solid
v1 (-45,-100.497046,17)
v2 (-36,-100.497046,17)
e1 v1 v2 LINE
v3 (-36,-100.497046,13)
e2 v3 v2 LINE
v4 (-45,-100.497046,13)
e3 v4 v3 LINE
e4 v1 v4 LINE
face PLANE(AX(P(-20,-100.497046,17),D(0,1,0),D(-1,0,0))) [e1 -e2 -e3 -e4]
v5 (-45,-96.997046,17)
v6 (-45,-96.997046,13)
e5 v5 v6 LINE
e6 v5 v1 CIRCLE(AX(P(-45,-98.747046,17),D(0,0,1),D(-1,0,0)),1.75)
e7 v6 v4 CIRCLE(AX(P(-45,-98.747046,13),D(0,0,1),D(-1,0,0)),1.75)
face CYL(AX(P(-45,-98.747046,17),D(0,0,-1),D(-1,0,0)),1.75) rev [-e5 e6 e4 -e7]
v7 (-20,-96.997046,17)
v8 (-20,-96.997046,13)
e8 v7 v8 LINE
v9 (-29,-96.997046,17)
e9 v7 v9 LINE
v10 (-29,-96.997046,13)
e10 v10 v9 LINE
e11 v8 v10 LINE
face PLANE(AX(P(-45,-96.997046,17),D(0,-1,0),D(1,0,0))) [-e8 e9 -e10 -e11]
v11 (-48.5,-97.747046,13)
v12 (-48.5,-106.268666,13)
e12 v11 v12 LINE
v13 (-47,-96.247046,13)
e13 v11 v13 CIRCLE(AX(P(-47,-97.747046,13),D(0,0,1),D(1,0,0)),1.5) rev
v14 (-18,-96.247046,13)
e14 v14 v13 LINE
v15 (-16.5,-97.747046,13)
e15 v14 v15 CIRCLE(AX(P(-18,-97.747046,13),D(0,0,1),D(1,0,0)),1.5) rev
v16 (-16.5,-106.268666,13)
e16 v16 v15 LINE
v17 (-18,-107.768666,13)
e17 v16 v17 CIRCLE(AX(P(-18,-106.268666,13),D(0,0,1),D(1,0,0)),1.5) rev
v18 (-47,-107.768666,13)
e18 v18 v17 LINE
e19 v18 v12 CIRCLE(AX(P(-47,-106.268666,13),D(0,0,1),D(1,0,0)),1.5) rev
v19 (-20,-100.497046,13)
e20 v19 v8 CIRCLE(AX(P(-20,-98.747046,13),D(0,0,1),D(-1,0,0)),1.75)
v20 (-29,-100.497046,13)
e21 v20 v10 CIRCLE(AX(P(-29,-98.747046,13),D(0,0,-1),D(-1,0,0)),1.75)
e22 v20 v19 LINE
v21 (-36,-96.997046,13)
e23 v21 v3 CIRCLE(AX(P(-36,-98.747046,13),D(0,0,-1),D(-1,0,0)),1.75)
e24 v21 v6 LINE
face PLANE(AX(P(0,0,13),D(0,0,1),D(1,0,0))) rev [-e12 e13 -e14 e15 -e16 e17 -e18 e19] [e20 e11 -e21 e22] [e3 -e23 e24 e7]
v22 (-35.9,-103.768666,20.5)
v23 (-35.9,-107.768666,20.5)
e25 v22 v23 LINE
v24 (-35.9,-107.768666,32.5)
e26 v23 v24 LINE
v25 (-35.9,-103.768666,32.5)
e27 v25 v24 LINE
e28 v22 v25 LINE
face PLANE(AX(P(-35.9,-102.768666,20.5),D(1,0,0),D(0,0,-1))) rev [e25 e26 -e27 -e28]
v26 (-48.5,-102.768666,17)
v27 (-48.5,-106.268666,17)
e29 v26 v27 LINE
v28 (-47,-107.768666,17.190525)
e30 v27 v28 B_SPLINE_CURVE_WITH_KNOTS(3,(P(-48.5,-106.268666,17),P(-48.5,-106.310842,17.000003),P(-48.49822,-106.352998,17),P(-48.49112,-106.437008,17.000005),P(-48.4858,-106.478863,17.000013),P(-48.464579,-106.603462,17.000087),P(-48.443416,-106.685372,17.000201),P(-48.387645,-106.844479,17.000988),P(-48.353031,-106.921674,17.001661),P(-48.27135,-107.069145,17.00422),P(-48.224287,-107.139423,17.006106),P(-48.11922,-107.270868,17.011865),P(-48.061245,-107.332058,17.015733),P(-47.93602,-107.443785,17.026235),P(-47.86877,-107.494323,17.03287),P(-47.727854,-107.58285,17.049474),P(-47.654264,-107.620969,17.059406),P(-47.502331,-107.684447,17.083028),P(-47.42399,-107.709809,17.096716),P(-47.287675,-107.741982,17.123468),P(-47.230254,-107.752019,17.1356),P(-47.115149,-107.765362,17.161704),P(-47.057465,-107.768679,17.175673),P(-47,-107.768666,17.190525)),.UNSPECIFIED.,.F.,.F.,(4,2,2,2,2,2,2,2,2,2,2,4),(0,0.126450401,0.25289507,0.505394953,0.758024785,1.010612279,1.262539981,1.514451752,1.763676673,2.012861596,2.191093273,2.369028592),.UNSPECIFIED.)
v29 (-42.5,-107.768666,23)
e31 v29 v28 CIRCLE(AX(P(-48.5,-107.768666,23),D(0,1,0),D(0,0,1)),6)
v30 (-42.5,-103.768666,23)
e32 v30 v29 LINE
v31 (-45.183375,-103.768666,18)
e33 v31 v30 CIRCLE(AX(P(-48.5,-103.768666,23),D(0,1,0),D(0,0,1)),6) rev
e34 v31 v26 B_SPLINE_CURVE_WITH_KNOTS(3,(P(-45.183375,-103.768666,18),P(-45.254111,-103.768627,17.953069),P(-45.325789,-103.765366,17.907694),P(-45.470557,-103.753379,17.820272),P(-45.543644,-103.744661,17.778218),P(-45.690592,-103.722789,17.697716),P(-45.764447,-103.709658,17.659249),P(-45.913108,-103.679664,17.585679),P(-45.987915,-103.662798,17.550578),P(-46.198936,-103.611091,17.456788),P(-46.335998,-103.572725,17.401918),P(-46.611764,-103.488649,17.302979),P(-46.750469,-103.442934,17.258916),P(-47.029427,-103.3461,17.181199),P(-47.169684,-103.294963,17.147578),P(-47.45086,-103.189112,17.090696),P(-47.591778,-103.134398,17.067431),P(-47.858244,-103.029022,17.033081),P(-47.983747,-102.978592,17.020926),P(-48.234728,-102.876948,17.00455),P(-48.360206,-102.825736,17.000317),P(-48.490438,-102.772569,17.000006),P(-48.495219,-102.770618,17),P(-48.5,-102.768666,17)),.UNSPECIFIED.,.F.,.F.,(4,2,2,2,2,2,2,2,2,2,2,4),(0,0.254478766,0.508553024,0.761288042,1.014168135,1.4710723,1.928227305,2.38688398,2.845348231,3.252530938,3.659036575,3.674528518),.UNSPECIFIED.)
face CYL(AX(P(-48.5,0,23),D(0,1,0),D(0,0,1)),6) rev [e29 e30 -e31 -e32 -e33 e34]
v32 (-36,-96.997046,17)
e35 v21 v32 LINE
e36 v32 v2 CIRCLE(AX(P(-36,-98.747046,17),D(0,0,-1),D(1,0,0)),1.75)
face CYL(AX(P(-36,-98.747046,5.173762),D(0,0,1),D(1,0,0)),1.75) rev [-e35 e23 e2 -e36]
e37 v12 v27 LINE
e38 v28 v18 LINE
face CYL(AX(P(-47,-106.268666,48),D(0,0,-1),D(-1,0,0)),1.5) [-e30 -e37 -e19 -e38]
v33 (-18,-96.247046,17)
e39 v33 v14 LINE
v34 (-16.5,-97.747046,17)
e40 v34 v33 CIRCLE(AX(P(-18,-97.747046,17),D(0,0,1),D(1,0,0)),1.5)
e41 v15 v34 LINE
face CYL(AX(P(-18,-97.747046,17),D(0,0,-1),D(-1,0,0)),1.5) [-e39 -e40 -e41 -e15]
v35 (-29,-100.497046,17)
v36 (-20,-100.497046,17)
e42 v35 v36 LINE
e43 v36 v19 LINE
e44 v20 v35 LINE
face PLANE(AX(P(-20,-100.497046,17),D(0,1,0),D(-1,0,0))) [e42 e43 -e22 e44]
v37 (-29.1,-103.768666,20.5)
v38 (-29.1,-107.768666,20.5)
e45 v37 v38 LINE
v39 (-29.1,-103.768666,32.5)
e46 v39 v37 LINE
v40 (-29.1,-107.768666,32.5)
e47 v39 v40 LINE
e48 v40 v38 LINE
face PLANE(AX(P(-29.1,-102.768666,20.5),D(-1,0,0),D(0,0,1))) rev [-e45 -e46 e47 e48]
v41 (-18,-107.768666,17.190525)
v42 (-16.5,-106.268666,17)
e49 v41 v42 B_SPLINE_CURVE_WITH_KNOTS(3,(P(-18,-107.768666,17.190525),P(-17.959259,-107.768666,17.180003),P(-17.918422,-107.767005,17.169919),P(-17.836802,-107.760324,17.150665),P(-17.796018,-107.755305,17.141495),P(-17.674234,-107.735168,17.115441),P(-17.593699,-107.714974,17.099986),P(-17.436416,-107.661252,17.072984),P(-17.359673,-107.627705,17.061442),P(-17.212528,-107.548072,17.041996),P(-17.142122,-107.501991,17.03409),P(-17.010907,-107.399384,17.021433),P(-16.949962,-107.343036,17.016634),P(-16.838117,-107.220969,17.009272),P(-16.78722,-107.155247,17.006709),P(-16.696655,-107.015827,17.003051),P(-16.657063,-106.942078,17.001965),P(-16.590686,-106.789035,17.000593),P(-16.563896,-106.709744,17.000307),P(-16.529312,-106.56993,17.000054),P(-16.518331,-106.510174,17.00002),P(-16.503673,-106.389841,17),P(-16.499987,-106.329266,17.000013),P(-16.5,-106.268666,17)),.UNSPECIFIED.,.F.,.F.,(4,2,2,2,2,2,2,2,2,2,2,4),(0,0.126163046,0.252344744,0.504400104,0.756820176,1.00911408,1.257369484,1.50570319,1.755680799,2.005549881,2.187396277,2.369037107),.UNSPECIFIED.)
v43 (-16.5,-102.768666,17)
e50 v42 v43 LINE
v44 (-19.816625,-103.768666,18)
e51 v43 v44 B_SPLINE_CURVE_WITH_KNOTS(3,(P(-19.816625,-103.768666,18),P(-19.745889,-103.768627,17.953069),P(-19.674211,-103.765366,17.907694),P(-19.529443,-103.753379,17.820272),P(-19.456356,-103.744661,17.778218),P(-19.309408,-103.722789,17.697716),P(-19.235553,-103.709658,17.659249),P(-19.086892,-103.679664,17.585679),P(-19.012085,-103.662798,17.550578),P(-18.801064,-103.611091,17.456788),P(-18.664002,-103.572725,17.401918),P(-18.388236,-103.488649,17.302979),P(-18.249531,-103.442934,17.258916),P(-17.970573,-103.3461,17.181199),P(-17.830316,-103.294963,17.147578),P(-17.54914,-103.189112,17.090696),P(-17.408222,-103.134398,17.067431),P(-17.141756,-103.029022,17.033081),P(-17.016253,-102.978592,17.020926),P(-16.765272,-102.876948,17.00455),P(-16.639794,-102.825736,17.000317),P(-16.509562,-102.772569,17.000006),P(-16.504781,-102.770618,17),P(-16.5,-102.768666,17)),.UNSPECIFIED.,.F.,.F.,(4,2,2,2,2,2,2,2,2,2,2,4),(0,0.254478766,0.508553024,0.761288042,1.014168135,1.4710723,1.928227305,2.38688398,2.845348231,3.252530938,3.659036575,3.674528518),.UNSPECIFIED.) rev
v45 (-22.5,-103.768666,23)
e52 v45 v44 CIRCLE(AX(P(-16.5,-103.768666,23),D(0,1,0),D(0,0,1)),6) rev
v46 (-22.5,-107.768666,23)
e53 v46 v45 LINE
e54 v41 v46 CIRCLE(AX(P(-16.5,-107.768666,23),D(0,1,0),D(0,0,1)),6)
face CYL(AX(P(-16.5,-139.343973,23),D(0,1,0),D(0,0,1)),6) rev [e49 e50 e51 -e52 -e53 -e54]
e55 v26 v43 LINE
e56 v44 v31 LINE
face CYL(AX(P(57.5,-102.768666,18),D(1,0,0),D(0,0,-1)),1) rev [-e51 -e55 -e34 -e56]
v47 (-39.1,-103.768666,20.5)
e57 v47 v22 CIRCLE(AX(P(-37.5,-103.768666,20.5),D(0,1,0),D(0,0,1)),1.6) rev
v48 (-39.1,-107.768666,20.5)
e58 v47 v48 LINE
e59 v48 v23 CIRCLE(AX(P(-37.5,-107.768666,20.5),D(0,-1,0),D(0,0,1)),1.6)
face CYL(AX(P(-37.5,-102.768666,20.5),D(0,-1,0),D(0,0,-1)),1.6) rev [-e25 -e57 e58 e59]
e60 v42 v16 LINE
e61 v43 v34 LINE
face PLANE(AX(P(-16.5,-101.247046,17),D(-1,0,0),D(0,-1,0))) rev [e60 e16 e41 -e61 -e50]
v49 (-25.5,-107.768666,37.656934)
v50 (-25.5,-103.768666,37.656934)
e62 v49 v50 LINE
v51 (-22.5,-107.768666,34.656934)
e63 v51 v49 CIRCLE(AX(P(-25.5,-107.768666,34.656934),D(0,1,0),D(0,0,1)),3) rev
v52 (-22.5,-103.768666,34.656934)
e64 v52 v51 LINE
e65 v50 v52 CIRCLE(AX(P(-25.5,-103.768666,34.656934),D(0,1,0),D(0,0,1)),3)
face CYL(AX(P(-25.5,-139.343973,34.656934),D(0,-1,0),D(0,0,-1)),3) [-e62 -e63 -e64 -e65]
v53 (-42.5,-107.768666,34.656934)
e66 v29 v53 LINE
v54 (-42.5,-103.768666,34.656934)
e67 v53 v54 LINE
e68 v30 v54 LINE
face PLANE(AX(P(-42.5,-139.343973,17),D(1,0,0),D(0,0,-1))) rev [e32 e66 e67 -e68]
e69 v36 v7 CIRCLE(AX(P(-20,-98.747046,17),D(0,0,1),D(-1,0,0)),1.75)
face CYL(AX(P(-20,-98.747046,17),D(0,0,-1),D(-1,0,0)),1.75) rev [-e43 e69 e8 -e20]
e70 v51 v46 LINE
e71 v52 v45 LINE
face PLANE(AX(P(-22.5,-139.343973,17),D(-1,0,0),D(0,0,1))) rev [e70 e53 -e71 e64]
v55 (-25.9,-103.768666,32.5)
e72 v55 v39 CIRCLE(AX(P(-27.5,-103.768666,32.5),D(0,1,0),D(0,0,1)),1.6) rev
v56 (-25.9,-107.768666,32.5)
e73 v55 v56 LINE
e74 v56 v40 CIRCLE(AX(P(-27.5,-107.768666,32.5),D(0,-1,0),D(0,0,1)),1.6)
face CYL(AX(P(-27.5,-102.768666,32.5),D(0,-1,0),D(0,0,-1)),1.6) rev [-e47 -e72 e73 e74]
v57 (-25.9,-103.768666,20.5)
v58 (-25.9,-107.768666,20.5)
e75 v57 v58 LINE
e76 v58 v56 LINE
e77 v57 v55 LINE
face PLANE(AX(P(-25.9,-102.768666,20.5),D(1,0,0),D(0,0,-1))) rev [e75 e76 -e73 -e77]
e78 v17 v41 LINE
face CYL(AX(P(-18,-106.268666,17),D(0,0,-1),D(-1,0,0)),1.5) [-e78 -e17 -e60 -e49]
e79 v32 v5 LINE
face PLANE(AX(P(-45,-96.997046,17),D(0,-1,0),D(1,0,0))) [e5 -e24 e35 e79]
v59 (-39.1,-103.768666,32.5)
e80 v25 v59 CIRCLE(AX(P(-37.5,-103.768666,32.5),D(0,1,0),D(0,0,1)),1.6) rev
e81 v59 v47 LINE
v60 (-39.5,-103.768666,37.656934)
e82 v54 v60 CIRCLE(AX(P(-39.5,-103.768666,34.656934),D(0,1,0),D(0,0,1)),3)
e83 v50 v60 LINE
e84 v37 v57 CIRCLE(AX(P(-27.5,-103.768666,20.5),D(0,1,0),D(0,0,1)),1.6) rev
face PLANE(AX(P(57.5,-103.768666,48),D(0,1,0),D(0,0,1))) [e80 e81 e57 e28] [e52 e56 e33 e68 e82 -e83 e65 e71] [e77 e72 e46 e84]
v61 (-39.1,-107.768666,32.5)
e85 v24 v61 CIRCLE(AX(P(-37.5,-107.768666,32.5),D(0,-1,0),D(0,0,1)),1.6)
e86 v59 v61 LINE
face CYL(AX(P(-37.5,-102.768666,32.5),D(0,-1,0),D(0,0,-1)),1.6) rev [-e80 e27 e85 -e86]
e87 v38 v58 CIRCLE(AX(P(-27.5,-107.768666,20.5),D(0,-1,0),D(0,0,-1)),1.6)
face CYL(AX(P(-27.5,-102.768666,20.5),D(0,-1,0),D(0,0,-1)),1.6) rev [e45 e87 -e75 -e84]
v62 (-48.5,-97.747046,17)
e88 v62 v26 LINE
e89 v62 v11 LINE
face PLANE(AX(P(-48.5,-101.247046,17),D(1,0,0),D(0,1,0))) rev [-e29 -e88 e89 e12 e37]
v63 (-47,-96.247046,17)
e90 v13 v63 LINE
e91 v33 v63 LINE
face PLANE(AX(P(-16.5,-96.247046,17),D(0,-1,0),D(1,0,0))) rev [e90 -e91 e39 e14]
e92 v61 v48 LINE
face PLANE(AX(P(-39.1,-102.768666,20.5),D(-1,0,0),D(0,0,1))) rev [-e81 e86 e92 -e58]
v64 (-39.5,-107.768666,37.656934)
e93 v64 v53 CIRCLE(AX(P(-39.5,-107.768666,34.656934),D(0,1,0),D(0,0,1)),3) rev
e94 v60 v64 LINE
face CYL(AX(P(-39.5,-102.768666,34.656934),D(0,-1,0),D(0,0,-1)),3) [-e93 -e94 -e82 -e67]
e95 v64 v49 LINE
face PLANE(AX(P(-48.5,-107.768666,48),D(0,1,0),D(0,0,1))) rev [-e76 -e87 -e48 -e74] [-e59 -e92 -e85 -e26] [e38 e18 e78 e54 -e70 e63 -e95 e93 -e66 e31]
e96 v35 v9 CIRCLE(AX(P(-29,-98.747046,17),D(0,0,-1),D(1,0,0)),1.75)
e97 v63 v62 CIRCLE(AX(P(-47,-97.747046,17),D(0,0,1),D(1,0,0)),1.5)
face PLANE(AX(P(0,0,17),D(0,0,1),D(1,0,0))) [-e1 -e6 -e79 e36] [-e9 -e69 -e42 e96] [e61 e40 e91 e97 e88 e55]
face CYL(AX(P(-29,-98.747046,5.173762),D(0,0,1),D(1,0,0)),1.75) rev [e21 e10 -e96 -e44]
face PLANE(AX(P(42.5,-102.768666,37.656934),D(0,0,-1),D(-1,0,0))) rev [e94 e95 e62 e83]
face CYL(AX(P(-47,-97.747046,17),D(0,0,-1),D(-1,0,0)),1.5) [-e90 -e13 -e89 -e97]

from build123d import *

# Parameters (mm, degrees)
EXTRUDE_1_DEPTH           = 3
SKETCH_7_R                = 2.25
CUT_EXTRUDE_2_DEPTH       = 143.955430949
SKETCH_8_R                = 8
CUT_EXTRUDE_3_DEPTH       = 143.955430949
CUT_EXTRUDE_4_DEPTH       = 3
CUT_EXTRUDE_5_DEPTH       = 3
CUT_EXTRUDE_8_DEPTH       = 3
SKETCH_12_R               = 1.7
CUT_EXTRUDE_9_DEPTH       = 3
SKETCH_13_R               = 1.7
CUT_EXTRUDE_11_DEPTH      = 3
CUT_EXTRUDE_12_DEPTH      = 143.955430949
FILLET_1_R                = 2
FILLET_2_R                = 2
CUT_EXTRUDE_13_DEPTH      = 143.955430949
CUT_EXTRUDE_14_DEPTH      = 143.955430949
CUT_EXTRUDE_15_DEPTH      = 143.955430949
CUT_EXTRUDE_16_DEPTH      = 143.955430949
EXTRUDE_2_DEPTH           = 4
EXTRUDE_2_2_DEPTH         = 4
EXTRUDE_4_DEPTH           = 4
EXTRUDE_5_DEPTH           = 35
SKETCH_25_W               = 6
SKETCH_25_H               = 31
CUT_EXTRUDE_17_DEPTH      = 5
FILLET_3_R                = 6
FILLET_4_R                = 6
FILLET_5_R                = 1.5
FILLET_6_R                = 1.5
CUT_EXTRUDE_18_DEPTH      = 5
CUT_EXTRUDE_19_DEPTH      = 15
CUT_EXTRUDE_19_DEPTH_BACK = 95
SKETCH_27_W               = 31
SKETCH_27_H               = 1
FILLET_8_R                = 1
FILLET_9_R                = 1
FILLET_10_R               = 3
SKETCH_28_W               = 85
SKETCH_28_H               = 10.343066278
CUT_EXTRUDE_20_DEPTH      = 5
FILLET_12_R               = 3
FILLET_13_R               = 3
SKETCH_32_W               = 45.323158308
SKETCH_32_H               = 39.541616474
CUT_EXTRUDE_22_DEPTH      = 40


# Read off the part's stored shape, not the designer's step: 切除-拉伸21
# Some blends are built 0.0001 mm under size
with BuildPart() as part:
    # 草图1 → 凸台-拉伸1 (new body)
    # profile 1 of 14: a face of its own
    with BuildSketch(Plane.XY):
        with BuildLine():
            Line((60, 106.603296002), (35.889163634, 121.664519159))
            Line((35.889163634, 121.664519159), (-35.889163634, 121.664519159))
            Line((-35.889163634, 121.664519159), (-60, 106.603296002))
            Line((-60, 106.603296002), (-60, 94.801892265))
            Line((-60, 94.801892265), (-45, 94.801892265))
            ThreePointArc((-45, 94.801892265), (-43.762563133, 94.289329132), (-43.25, 93.051892265))
            Line((-43.25, 93.051892265), (-37.75, 93.051892265))
            ThreePointArc((-37.75, 93.051892265), (-37.237436867, 94.289329132), (-36, 94.801892265))
            Line((-36, 94.801892265), (-21, 94.801892265))
            ThreePointArc((-21, 94.801892265), (-19.762563133, 94.289329132), (-19.25, 93.051892265))
            Line((-19.25, 93.051892265), (19.25, 93.051892265))
            ThreePointArc((19.25, 93.051892265), (19.762563133, 94.289329132), (21, 94.801892265))
            Line((21, 94.801892265), (36, 94.801892265))
            ThreePointArc((36, 94.801892265), (37.237436867, 94.289329132), (37.75, 93.051892265))
            Line((37.75, 93.051892265), (43.25, 93.051892265))
            ThreePointArc((43.25, 93.051892265), (43.762563133, 94.289329132), (45, 94.801892265))
            Line((45, 94.801892265), (60, 94.801892265))
            Line((60, 94.801892265), (60, 106.603296002))
        make_face()
    # profile 2 of 14: a face of its own
    with BuildSketch(Plane.XY):
        with BuildLine():
            Line((66.901694095, 102.292041372), (60, 106.603296002))
            Line((60, 106.603296002), (60, 94.801892265))
            ThreePointArc((60, 94.801892265), (61.237436867, 94.289329132), (61.75, 93.051892265))
            Line((61.75, 93.051892265), (66.901694095, 93.051892265))
            Line((66.901694095, 93.051892265), (66.901694095, 102.292041372))
        make_face()
    # profile 3 of 14: a face of its own
    with BuildSketch(Plane.XY):
        with BuildLine():
            Line((-60, 94.801892265), (-60, 106.603296002))
            Line((-60, 106.603296002), (-66.901694095, 102.292041372))
            Line((-66.901694095, 102.292041372), (-66.901694095, 93.051892265))
            Line((-66.901694095, 93.051892265), (-61.75, 93.051892265))
            ThreePointArc((-61.75, 93.051892265), (-61.237436867, 94.289329132), (-60, 94.801892265))
        make_face()
    # profile 4 of 14: a face of its own
    with BuildSketch(Plane.XY):
        with BuildLine():
            Line((66.901694095, 63.051892265), (66.901694095, 93.051892265))
            Line((66.901694095, 93.051892265), (61.75, 93.051892265))
            ThreePointArc((61.75, 93.051892265), (61.237436867, 91.814455398), (60, 91.301892265))
            Line((60, 91.301892265), (60, 64.801892265))
            ThreePointArc((60, 64.801892265), (61.237436867, 64.289329132), (61.75, 63.051892265))
            Line((61.75, 63.051892265), (66.901694095, 63.051892265))
        make_face()
    # profile 5 of 14: a face of its own
    with BuildSketch(Plane.XY):
        with BuildLine():
            Line((-61.75, 93.051892265), (-66.901694095, 93.051892265))
            Line((-66.901694095, 93.051892265), (-66.901694095, 63.051892265))
            Line((-66.901694095, 63.051892265), (-61.75, 63.051892265))
            ThreePointArc((-61.75, 63.051892265), (-61.237436867, 64.289329132), (-60, 64.801892265))
            Line((-60, 64.801892265), (-60, 91.301892265))
            ThreePointArc((-60, 91.301892265), (-61.237436867, 91.814455398), (-61.75, 93.051892265))
        make_face()
    # profile 6 of 14: a face of its own
    with BuildSketch(Plane.XY):
        with BuildLine():
            Line((66.901694095, 52.870133869), (66.901694095, 63.051892265))
            Line((66.901694095, 63.051892265), (61.75, 63.051892265))
            ThreePointArc((61.75, 63.051892265), (61.237436867, 61.814455398), (60, 61.301892265))
            Line((60, 61.301892265), (60, 31.261343001))
            Line((60, 31.261343001), (75, 31.261343001))
            Line((75, 31.261343001), (75, 40.933889795))
            ThreePointArc((75, 40.933889795), (69.117351927, 45.658052319), (66.901694095, 52.870133869))
        make_face()
    # profile 7 of 14: a face of its own
    with BuildSketch(Plane.XY):
        with BuildLine():
            Line((60, 64.801892265), (60, 91.301892265))
            Line((60, 91.301892265), (45, 91.301892265))
            ThreePointArc((45, 91.301892265), (43.762563133, 91.814455398), (43.25, 93.051892265))
            Line((43.25, 93.051892265), (37.75, 93.051892265))
            ThreePointArc((37.75, 93.051892265), (37.237436867, 91.814455398), (36, 91.301892265))
            Line((36, 91.301892265), (21, 91.301892265))
            ThreePointArc((21, 91.301892265), (19.762563133, 91.814455398), (19.25, 93.051892265))
            Line((19.25, 93.051892265), (-19.25, 93.051892265))
            ThreePointArc((-19.25, 93.051892265), (-19.762563133, 91.814455398), (-21, 91.301892265))
            Line((-21, 91.301892265), (-36, 91.301892265))
            ThreePointArc((-36, 91.301892265), (-37.237436867, 91.814455398), (-37.75, 93.051892265))
            Line((-37.75, 93.051892265), (-43.25, 93.051892265))
            ThreePointArc((-43.25, 93.051892265), (-43.762563133, 91.814455398), (-45, 91.301892265))
            Line((-45, 91.301892265), (-60, 91.301892265))
            Line((-60, 91.301892265), (-60, 64.801892265))
            Line((-60, 64.801892265), (-45, 64.801892265))
            ThreePointArc((-45, 64.801892265), (-43.762563133, 64.289329132), (-43.25, 63.051892265))
            Line((-43.25, 63.051892265), (-37.75, 63.051892265))
            ThreePointArc((-37.75, 63.051892265), (-37.237436867, 64.289329132), (-36, 64.801892265))
            Line((-36, 64.801892265), (-21, 64.801892265))
            ThreePointArc((-21, 64.801892265), (-19.762563133, 64.289329132), (-19.25, 63.051892265))
            Line((-19.25, 63.051892265), (19.25, 63.051892265))
            ThreePointArc((19.25, 63.051892265), (19.762563133, 64.289329132), (21, 64.801892265))
            Line((21, 64.801892265), (36, 64.801892265))
            ThreePointArc((36, 64.801892265), (37.237436867, 64.289329132), (37.75, 63.051892265))
            Line((37.75, 63.051892265), (43.25, 63.051892265))
            ThreePointArc((43.25, 63.051892265), (43.762563133, 64.289329132), (45, 64.801892265))
            Line((45, 64.801892265), (60, 64.801892265))
        make_face()
    # profile 8 of 14: a face of its own
    with BuildSketch(Plane.XY):
        with BuildLine():
            Line((-61.75, 63.051892265), (-66.901694095, 63.051892265))
            Line((-66.901694095, 63.051892265), (-66.901694095, 52.870133869))
            ThreePointArc((-66.901694095, 52.870133869), (-69.117351927, 45.658052319), (-75, 40.933889795))
            Line((-75, 40.933889795), (-75, 31.261343001))
            Line((-75, 31.261343001), (-60, 31.261343001))
            Line((-60, 31.261343001), (-60, 61.301892265))
            ThreePointArc((-60, 61.301892265), (-61.237436867, 61.814455398), (-61.75, 63.051892265))
        make_face()
    # profile 9 of 14: a face of its own
    with BuildSketch(Plane.XY):
        with BuildLine():
            Line((60, 31.261343001), (60, 61.301892265))
            Line((60, 61.301892265), (45, 61.301892265))
            ThreePointArc((45, 61.301892265), (43.762563133, 61.814455398), (43.25, 63.051892265))
            Line((43.25, 63.051892265), (37.75, 63.051892265))
            ThreePointArc((37.75, 63.051892265), (37.237436867, 61.814455398), (36, 61.301892265))
            Line((36, 61.301892265), (21, 61.301892265))
            ThreePointArc((21, 61.301892265), (19.762563133, 61.814455398), (19.25, 63.051892265))
            Line((19.25, 63.051892265), (-19.25, 63.051892265))
            ThreePointArc((-19.25, 63.051892265), (-19.762563133, 61.814455398), (-21, 61.301892265))
            Line((-21, 61.301892265), (-36, 61.301892265))
            ThreePointArc((-36, 61.301892265), (-37.237436867, 61.814455398), (-37.75, 63.051892265))
            Line((-37.75, 63.051892265), (-43.25, 63.051892265))
            ThreePointArc((-43.25, 63.051892265), (-43.762563133, 61.814455398), (-45, 61.301892265))
            Line((-45, 61.301892265), (-60, 61.301892265))
            Line((-60, 61.301892265), (-60, 31.261343001))
            Line((-60, 31.261343001), (60, 31.261343001))
        make_face()
    # profile 10 of 14: a face of its own
    with BuildSketch(Plane.XY):
        with BuildLine():
            Line((60, -58.312864289), (60, 23.940028391))
            Line((60, 23.940028391), (-60, 23.940028391))
            Line((-60, 23.940028391), (-60, -58.312864289))
            Line((-60, -58.312864289), (-45, -58.312864289))
            ThreePointArc((-45, -58.312864289), (-43.25, -60.062864289), (-45, -61.812864289))
            Line((-45, -61.812864289), (-60, -61.812864289))
            Line((-60, -61.812864289), (-60, -88.312864289))
            Line((-60, -88.312864289), (-45, -88.312864289))
            ThreePointArc((-45, -88.312864289), (-43.25, -90.062864289), (-45, -91.812864289))
            Line((-45, -91.812864289), (-60, -91.812864289))
            Line((-60, -91.812864289), (-60, -111.849967256))
            Line((-60, -111.849967256), (-38.845469114, -105.590576733))
            ThreePointArc((-38.845469114, -105.590576733), (-36.037784492, -104.975210108), (-33.17088573, -104.768665882))
            Line((-33.17088573, -104.768665882), (33.17088573, -104.768665882))
            ThreePointArc((33.17088573, -104.768665882), (36.037784492, -104.975210108), (38.845469114, -105.590576733))
            Line((38.845469114, -105.590576733), (60, -111.849967256))
            Line((60, -111.849967256), (60, -91.812864289))
            Line((60, -91.812864289), (45, -91.812864289))
            ThreePointArc((45, -91.812864289), (43.762563133, -91.300301156), (43.25, -90.062864289))
            ThreePointArc((43.25, -90.062864289), (43.762563133, -88.825427422), (45, -88.312864289))
            Line((45, -88.312864289), (60, -88.312864289))
            Line((60, -88.312864289), (60, -61.812864289))
            Line((60, -61.812864289), (45, -61.812864289))
            ThreePointArc((45, -61.812864289), (43.762563133, -61.300301156), (43.25, -60.062864289))
            ThreePointArc((43.25, -60.062864289), (43.762563133, -58.825427422), (45, -58.312864289))
            Line((45, -58.312864289), (60, -58.312864289))
        make_face()
        with BuildLine():
            ThreePointArc((-21, -88.312864289), (-19.762563133, -88.825427422), (-19.25, -90.062864289))
            ThreePointArc((-19.25, -90.062864289), (-19.762563133, -91.300301156), (-21, -91.812864289))
            Line((-21, -91.812864289), (-36, -91.812864289))
            ThreePointArc((-36, -91.812864289), (-37.75, -90.062864289), (-36, -88.312864289))
            Line((-36, -88.312864289), (-21, -88.312864289))
        make_face(mode=Mode.SUBTRACT)
        with BuildLine():
            ThreePointArc((-21, -58.312864289), (-19.762563133, -58.825427422), (-19.25, -60.062864289))
            ThreePointArc((-19.25, -60.062864289), (-19.762563133, -61.300301156), (-21, -61.812864289))
            Line((-21, -61.812864289), (-36, -61.812864289))
            ThreePointArc((-36, -61.812864289), (-37.75, -60.062864289), (-36, -58.312864289))
            Line((-36, -58.312864289), (-21, -58.312864289))
        make_face(mode=Mode.SUBTRACT)
        with BuildLine():
            ThreePointArc((36, -88.312864289), (37.237436867, -88.825427422), (37.75, -90.062864289))
            ThreePointArc((37.75, -90.062864289), (37.237436867, -91.300301156), (36, -91.812864289))
            Line((36, -91.812864289), (21, -91.812864289))
            ThreePointArc((21, -91.812864289), (19.762563133, -91.300301156), (19.25, -90.062864289))
            ThreePointArc((19.25, -90.062864289), (19.762563133, -88.825427422), (21, -88.312864289))
            Line((21, -88.312864289), (36, -88.312864289))
        make_face(mode=Mode.SUBTRACT)
        with BuildLine():
            ThreePointArc((36, -58.312864289), (37.237436867, -58.825427422), (37.75, -60.062864289))
            ThreePointArc((37.75, -60.062864289), (37.237436867, -61.300301156), (36, -61.812864289))
            Line((36, -61.812864289), (21, -61.812864289))
            ThreePointArc((21, -61.812864289), (19.762563133, -61.300301156), (19.25, -60.062864289))
            ThreePointArc((19.25, -60.062864289), (19.762563133, -58.825427422), (21, -58.312864289))
            Line((21, -58.312864289), (36, -58.312864289))
        make_face(mode=Mode.SUBTRACT)
    # profile 11 of 14: a face of its own
    with BuildSketch(Plane.XY):
        with BuildLine():
            Line((75, 23.940028391), (60, 23.940028391))
            Line((60, 23.940028391), (60, -58.312864289))
            ThreePointArc((60, -58.312864289), (61.237436867, -58.825427422), (61.75, -60.062864289))
            Line((61.75, -60.062864289), (67.402721334, -60.062864289))
            add(Edge.make_bspline(
                [(75, 10.562559835), (72.695878257, 1.907314233), (70.339582535, -13.372796253), (67.818206704, -36.939032951), (67.208860388, -51.77269444), (67.402721334, -60.062864289)],
                knots=[0, 0, 0, 0, 0.235246678, 0.40629419, 0.624108181, 0.624108181, 0.624108181, 0.624108181], degree=3))
            Line((75, 10.562559835), (75, 23.940028391))
        make_face()
    # profile 12 of 14: a face of its own
    with BuildSketch(Plane.XY):
        with BuildLine():
            Line((-60, -58.312864289), (-60, 23.940028391))
            Line((-60, 23.940028391), (-75, 23.940028391))
            Line((-75, 23.940028391), (-75, 10.562559835))
            add(Edge.make_bspline(
                [(-75, 10.562559835), (-72.695878257, 1.907314233), (-70.339582535, -13.372796253), (-67.818206704, -36.939032951), (-67.208860388, -51.77269444), (-67.402721334, -60.062864289)],
                knots=[0, 0, 0, 0, 0.235246678, 0.40629419, 0.624108181, 0.624108181, 0.624108181, 0.624108181], degree=3))
            add(Edge.make_bspline(
                [(-67.402721334, -60.062864289), (-67.560325872, -66.802583754), (-68.323504015, -76.843670093), (-70.154131955, -86.778530076), (-70.533712858, -90.062864289)],
                knots=[0.624108181, 0.624108181, 0.624108181, 0.624108181, 0.801186001, 0.888408652, 0.888408652, 0.888408652, 0.888408652], degree=3))
            add(Edge.make_bspline(
                [(-70.533712858, -90.062864289), (-71.019342956, -94.264792095), (-71.137422935, -98.476048206), (-70.1742624, -102.732794059)],
                knots=[0.888408652, 0.888408652, 0.888408652, 0.888408652, 1, 1, 1, 1], degree=3))
            Line((-70.1742624, -102.732794059), (-66.460817635, -113.761651372))
            Line((-66.460817635, -113.761651372), (-60, -111.849967256))
            Line((-60, -111.849967256), (-60, -91.812864289))
            ThreePointArc((-60, -91.812864289), (-61.75, -90.062864289), (-60, -88.312864289))
            Line((-60, -88.312864289), (-60, -61.812864289))
            ThreePointArc((-60, -61.812864289), (-61.75, -60.062864289), (-60, -58.312864289))
        make_face()
    # profile 13 of 14: a face of its own
    with BuildSketch(Plane.XY):
        with BuildLine():
            Line((67.402721334, -60.062864289), (61.75, -60.062864289))
            ThreePointArc((61.75, -60.062864289), (61.237436867, -61.300301156), (60, -61.812864289))
            Line((60, -61.812864289), (60, -88.312864289))
            ThreePointArc((60, -88.312864289), (61.237436867, -88.825427422), (61.75, -90.062864289))
            Line((61.75, -90.062864289), (70.533712858, -90.062864289))
            add(Edge.make_bspline(
                [(67.402721334, -60.062864289), (67.560325872, -66.802583754), (68.323504015, -76.843670093), (70.154131955, -86.778530076), (70.533712858, -90.062864289)],
                knots=[0.624108181, 0.624108181, 0.624108181, 0.624108181, 0.801186001, 0.888408652, 0.888408652, 0.888408652, 0.888408652], degree=3))
        make_face()
    # profile 14 of 14: a face of its own
    with BuildSketch(Plane.XY):
        with BuildLine():
            add(Edge.make_bspline(
                [(70.533712858, -90.062864289), (71.019342956, -94.264792095), (71.137422935, -98.476048206), (70.1742624, -102.732794059)],
                knots=[0.888408652, 0.888408652, 0.888408652, 0.888408652, 1, 1, 1, 1], degree=3))
            Line((70.533712858, -90.062864289), (61.75, -90.062864289))
            ThreePointArc((61.75, -90.062864289), (61.237436867, -91.300301156), (60, -91.812864289))
            Line((60, -91.812864289), (60, -111.849967256))
            Line((60, -111.849967256), (66.460817635, -113.761651372))
            Line((66.460817635, -113.761651372), (70.1742624, -102.732794059))
        make_face()
    extrude(amount=EXTRUDE_1_DEPTH)

    # 草图7 → 切除-拉伸2 (cut, through all)
    with BuildSketch(Plane(origin=(0, 0, 0), x_dir=(-1, 0, 0), z_dir=(0, 0, -1))):
        with Locations((-21, 41.261343001)):
            Circle(SKETCH_7_R)
        with Locations((21, 41.261343001)):
            Circle(SKETCH_7_R)
        with Locations((-21, 13.940028391)):
            Circle(SKETCH_7_R)
        with Locations((21, 13.940028391)):
            Circle(SKETCH_7_R)
    extrude(amount=-CUT_EXTRUDE_2_DEPTH, mode=Mode.SUBTRACT)

    # 草图8 → 切除-拉伸3 (cut, through all)
    with BuildSketch(Plane.XY.offset(3)):
        with BuildLine():
            Line((-12.621438714, -0.378557945), (-33.409010345, 20.409013685))
            ThreePointArc((-33.409010345, 20.409013685), (-36.590999434, 20.409013643), (-36.590999309, 17.227024553))
            Line((-36.590999309, 17.227024553), (-15.803426586, -3.560545984))
            ThreePointArc((-15.803426586, -3.560545984), (-12.621438673, -3.560545859), (-12.621438714, -0.378557945))
        make_face()
        with BuildLine():
            Line((33.410462056, 20.410458798), (12.572988319, -0.427010824))
            ThreePointArc((12.572988319, -0.427010824), (12.644570441, -3.584764993), (15.803045702, -3.56090242))
            Line((15.803045702, -3.56090242), (34.999999982, 15.636052774))
            Line((34.999999982, 15.636052774), (36.588086952, 17.224139819))
            ThreePointArc((36.588086952, 17.224139819), (36.592433993, 20.406111757), (33.410462056, 20.410458798))
        make_face()
        with BuildLine():
            Line((-15.803784812, -28.80377835), (-36.591002186, -49.590991619))
            ThreePointArc((-36.591002186, -49.590991619), (-36.591002403, -52.772972232), (-33.40902179, -52.772972254))
            Line((-33.40902179, -52.772972254), (-12.573723916, -31.937673388))
            ThreePointArc((-12.573723916, -31.937673388), (-12.64530628, -28.779915954), (-15.803784812, -28.80377835))
        make_face()
        with BuildLine():
            Line((36.590992666, -49.590989326), (15.803414627, -28.803411286))
            ThreePointArc((15.803414627, -28.803411286), (12.654338964, -28.769774302), (12.55344336, -31.917412949))
            Line((12.55344336, -31.917412949), (33.409007381, -52.772974779))
            ThreePointArc((33.409007381, -52.772974779), (36.590992708, -52.772974653), (36.590992666, -49.590989326))
        make_face()
        with Locations((-0.000368782, -16.182341354)):
            Circle(SKETCH_8_R)
    extrude(amount=-CUT_EXTRUDE_3_DEPTH, mode=Mode.SUBTRACT)

    # 草图9 → 切除-拉伸4 (cut)
    with BuildSketch(Plane.XY.offset(3)):
        with BuildLine():
            Line((55, -100.49704609), (20, -100.49704609))
            ThreePointArc((20, -100.49704609), (18.25, -98.74704609), (20, -96.99704609))
            Line((20, -96.99704609), (55, -96.99704609))
            ThreePointArc((55, -96.99704609), (56.75, -98.74704609), (55, -100.49704609))
        make_face()
        with BuildLine():
            Line((-55, -96.99704609), (-20, -96.99704609))
            ThreePointArc((-20, -96.99704609), (-18.25, -98.74704609), (-20, -100.49704609))
            Line((-20, -100.49704609), (-55, -100.49704609))
            ThreePointArc((-55, -100.49704609), (-56.75, -98.74704609), (-55, -96.99704609))
        make_face()
    extrude(amount=-CUT_EXTRUDE_4_DEPTH, mode=Mode.SUBTRACT)

    # 草图10 → 切除-拉伸5 (cut)
    with BuildSketch(Plane.XY.offset(3)):
        with BuildLine():
            Line((12.5, -80.062864289), (-12.5, -80.062864289))
            ThreePointArc((-12.5, -80.062864289), (-17.5, -75.062864289), (-12.5, -70.062864289))
            Line((-12.5, -70.062864289), (12.5, -70.062864289))
            ThreePointArc((12.5, -70.062864289), (17.5, -75.062864289), (12.5, -80.062864289))
        make_face()
    extrude(amount=-CUT_EXTRUDE_5_DEPTH, mode=Mode.SUBTRACT)

    # 草图11 → 切除-拉伸8 (cut)
    with BuildSketch(Plane.XY.offset(3)):
        with BuildLine():
            Line((15, 73.051892265), (-15, 73.051892265))
            ThreePointArc((-15, 73.051892265), (-20, 78.051892265), (-15, 83.051892265))
            Line((-15, 83.051892265), (15, 83.051892265))
            ThreePointArc((15, 83.051892265), (20, 78.051892265), (15, 73.051892265))
        make_face()
    extrude(amount=-CUT_EXTRUDE_8_DEPTH, mode=Mode.SUBTRACT)

    # 草图12 → 切除-拉伸9 (cut)
    with BuildSketch(Plane.XY.offset(3)):
        with Locations((0, 114.371786435)):
            Circle(SKETCH_12_R)
        with Locations((0, 98.371786435)):
            Circle(SKETCH_12_R)
        with Locations((8, 106.371786435)):
            Circle(SKETCH_12_R)
        with Locations((-8, 106.371786435)):
            Circle(SKETCH_12_R)
    extrude(amount=-CUT_EXTRUDE_9_DEPTH, mode=Mode.SUBTRACT)

    # 草图13 → 切除-拉伸11 (cut)
    with BuildSketch(Plane.XY.offset(3)):
        with Locations((0, -84.415765086)):
            Circle(SKETCH_13_R)
        with Locations((8, -92.415765086)):
            Circle(SKETCH_13_R)
        with Locations((0, -100.415765086)):
            Circle(SKETCH_13_R)
        with Locations((-8, -92.415765086)):
            Circle(SKETCH_13_R)
    extrude(amount=-CUT_EXTRUDE_11_DEPTH, mode=Mode.SUBTRACT)

    # 草图14 → 切除-拉伸12 (cut, through all)
    with BuildSketch(Plane.XY.offset(3)):
        with BuildLine():
            Line((-55.475501567, 8.919687236), (-55.475501567, -46.080312764))
            ThreePointArc((-55.475501567, -46.080312764), (-57.225501567, -47.830312764), (-58.975501567, -46.080312764))
            Line((-58.975501567, -46.080312764), (-58.975501567, 8.919687236))
            ThreePointArc((-58.975501567, 8.919687236), (-57.225501567, 10.669687236), (-55.475501567, 8.919687236))
        make_face()
        with BuildLine():
            Line((58.975501567, 8.919687236), (58.975501567, -46.080312764))
            ThreePointArc((58.975501567, -46.080312764), (57.225501567, -47.830312764), (55.475501567, -46.080312764))
            Line((55.475501567, -46.080312764), (55.475501567, 8.919687236))
            ThreePointArc((55.475501567, 8.919687236), (57.225501567, 10.669687236), (58.975501567, 8.919687236))
        make_face()
    extrude(amount=-CUT_EXTRUDE_12_DEPTH, mode=Mode.SUBTRACT)

    # 圆角1
    fillet_1_edges = [part.edges().sort_by_distance(p)[0] for p in [
        (75, 31.261343001, 1.5),
        (-75, 31.261343001, 1.5),
    ]]
    fillet(fillet_1_edges, radius=FILLET_1_R)

    # 圆角2
    fillet_2_edges = [part.edges().sort_by_distance(p)[0] for p in [
        (-75, 23.940028391, 1.5),
        (75, 23.940028391, 1.5),
    ]]
    fillet(fillet_2_edges, radius=FILLET_2_R)

    # 草图15 → 切除-拉伸13 (cut, through all)
    with BuildSketch(Plane(origin=(0, 0, 0), x_dir=(-1, 0, 0), z_dir=(0, 0, -1))):
        with BuildLine():
            Line((-61.184216401, 102.403501276), (-34.774762862, 118.900592756))
            ThreePointArc((-34.774762862, 118.900592756), (-32.70788159, 118.423097411), (-33.185376934, 116.356216138))
            Line((-33.185376934, 116.356216138), (-59.594830473, 99.859124658))
            ThreePointArc((-59.594830473, 99.859124658), (-61.661711746, 100.336620003), (-61.184216401, 102.403501276))
        make_face()
        with BuildLine():
            Line((59.594830473, 99.859124658), (33.185376934, 116.356216138))
            ThreePointArc((33.185376934, 116.356216138), (32.70788159, 118.423097411), (34.774762862, 118.900592756))
            Line((34.774762862, 118.900592756), (61.184216401, 102.403501276))
            ThreePointArc((61.184216401, 102.403501276), (61.661711746, 100.336620003), (59.594830473, 99.859124658))
        make_face()
    extrude(amount=-CUT_EXTRUDE_13_DEPTH, mode=Mode.SUBTRACT)

    # 草图16 → 切除-拉伸14 (cut, through all)
    with BuildSketch(Plane(origin=(0, 0, 0), x_dir=(-1, 0, 0), z_dir=(0, 0, -1))):
        with BuildLine():
            Line((-61.516979467, 42.761343001), (-32.056291893, 42.761343001))
            ThreePointArc((-32.056291893, 42.761343001), (-30.556291893, 41.261343001), (-32.056291893, 39.761343001))
            Line((-32.056291893, 39.761343001), (-61.516979467, 39.761343001))
            ThreePointArc((-61.516979467, 39.761343001), (-63.016979467, 41.261343001), (-61.516979467, 42.761343001))
        make_face()
        with BuildLine():
            Line((61.516979467, 39.761343001), (32.056291893, 39.761343001))
            ThreePointArc((32.056291893, 39.761343001), (30.556291893, 41.261343001), (32.056291893, 42.761343001))
            Line((32.056291893, 42.761343001), (61.516979467, 42.761343001))
            ThreePointArc((61.516979467, 42.761343001), (63.016979467, 41.261343001), (61.516979467, 39.761343001))
        make_face()
    extrude(amount=-CUT_EXTRUDE_14_DEPTH, mode=Mode.SUBTRACT)

    # 草图17 → 切除-拉伸15 (cut, through all)
    with BuildSketch(Plane(origin=(0, 0, 0), x_dir=(-1, 0, 0), z_dir=(0, 0, -1))):
        Polygon((-28.645414283, -8.118433382), (-34.644957411, -20.11751964), (-34.644957411, -29.946558382), (-37.580904049, -29.946558382), (-37.580904049, -20.11751964), (-43.580447177, -8.118433382), (-40.64450054, -8.118433382), (-36.176755657, -17.43687271), (-36.049105803, -17.43687271), (-31.58136092, -8.118433382), align=None)
    extrude(amount=-CUT_EXTRUDE_15_DEPTH, mode=Mode.SUBTRACT)

    # 草图18 → 切除-拉伸16 (cut, through all)
    with BuildSketch(Plane(origin=(0, 0, 0), x_dir=(-1, 0, 0), z_dir=(0, 0, -1))):
        Polygon((46.06697123, -29.087529791), (43.131024593, -29.087529791), (43.131024593, -18.875541487), (35.854982926, -18.875541487), (35.854982926, -29.087529791), (32.919036289, -29.087529791), (32.919036289, -7.259404791), (35.854982926, -7.259404791), (35.854982926, -16.450194265), (43.131024593, -16.450194265), (43.131024593, -7.259404791), (46.06697123, -7.259404791), align=None)
    extrude(amount=-CUT_EXTRUDE_16_DEPTH, mode=Mode.SUBTRACT)


with BuildPart() as body_2:
    # 草图19 → 凸台-拉伸2 (new body)
    with BuildSketch(Plane.XY.offset(13)):
        Polygon((16.5, -101.24704609), (16.5, -96.24704609), (48.5, -96.24704609), (48.5, -101.24704609), (48.5, -104.768665882), (16.5, -104.768665882), align=None)
        with BuildLine():
            Line((20, -100.49704609), (45, -100.49704609))
            ThreePointArc((45, -100.49704609), (46.75, -98.74704609), (45, -96.99704609))
            Line((45, -96.99704609), (20, -96.99704609))
            ThreePointArc((20, -96.99704609), (18.25, -98.74704609), (20, -100.49704609))
        make_face(mode=Mode.SUBTRACT)
    extrude(amount=EXTRUDE_2_DEPTH)



with BuildPart() as body_3:
    # 草图19 → Extrude 2 2 (new body)
    with BuildSketch(Plane.XY.offset(13)):
        Polygon((-16.5, -101.24704609), (-16.5, -104.768665882), (-48.5, -104.768665882), (-48.5, -101.24704609), (-48.5, -96.24704609), (-16.5, -96.24704609), align=None)
        with BuildLine():
            Line((-45, -96.99704609), (-20, -96.99704609))
            ThreePointArc((-20, -96.99704609), (-18.25, -98.74704609), (-20, -100.49704609))
            Line((-20, -100.49704609), (-45, -100.49704609))
            ThreePointArc((-45, -100.49704609), (-46.75, -98.74704609), (-45, -96.99704609))
        make_face(mode=Mode.SUBTRACT)
    extrude(amount=EXTRUDE_2_2_DEPTH)


with BuildPart() as body_2_1:
    add(body_2.part)

    add(body_3.part)  # 凸台-拉伸4 merges body 3
    # 草图21 → 凸台-拉伸4 (add)
    with BuildSketch(Plane.XY.offset(17)):
        with BuildLine():
            Line((-36, -96.99704609), (-29, -96.99704609))
            ThreePointArc((-29, -96.99704609), (-30.75, -98.74704609), (-29, -100.49704609))
            Line((-29, -100.49704609), (-36, -100.49704609))
            ThreePointArc((-36, -100.49704609), (-34.25, -98.74704609), (-36, -96.99704609))
        make_face()
        with BuildLine():
            Line((36, -100.49704609), (29, -100.49704609))
            ThreePointArc((29, -100.49704609), (30.75, -98.74704609), (29, -96.99704609))
            Line((29, -96.99704609), (36, -96.99704609))
            ThreePointArc((36, -96.99704609), (34.25, -98.74704609), (36, -100.49704609))
        make_face()
    extrude(amount=-EXTRUDE_4_DEPTH)

    # 草图23 → 凸台-拉伸5 (add)
    with BuildSketch(Plane.XY.offset(13)):
        Polygon((-48.5, -104.768665882), (-48.5, -107.768665882), (-16.5, -107.768665882), (-16.5, -104.768665882), (-16.5, -102.768665882), (-48.5, -102.768665882), align=None)
        Polygon((16.5, -104.768665882), (16.5, -107.768665882), (48.5, -107.768665882), (48.5, -104.768665882), (48.5, -102.768665882), (16.5, -102.768665882), align=None)
    extrude(amount=EXTRUDE_5_DEPTH)

    # 草图25 → 切除-拉伸17 (cut)
    with BuildSketch(Plane(origin=(0, -102.768665882, 0), x_dir=(1, 0, 0), z_dir=(0, 1, 0))):
        with Locations((-19.5, -32.5)):
            Rectangle(SKETCH_25_W, SKETCH_25_H)
        with Locations((-45.5, -32.5)):
            Rectangle(SKETCH_25_W, SKETCH_25_H)
        with Locations((19.5, -32.5)):
            Rectangle(SKETCH_25_W, SKETCH_25_H)
        with Locations((45.5, -32.5)):
            Rectangle(SKETCH_25_W, SKETCH_25_H)
    extrude(amount=-CUT_EXTRUDE_17_DEPTH, mode=Mode.SUBTRACT)

    # 圆角3
    fillet_3_edges = [body_2_1.edges().sort_by_distance(p)[0] for p in [
        (22.5, -105.268665882, 17),
        (42.5, -105.268665882, 17),
    ]]
    fillet(fillet_3_edges, radius=FILLET_3_R - 0.0001)  # a hair under: the kernel refuses the full size

    # 圆角4
    fillet_4_edges = [body_2_1.edges().sort_by_distance(p)[0] for p in [
        (-42.5, -105.268665882, 17),
        (-22.5, -105.268665882, 17),
    ]]
    fillet(fillet_4_edges, radius=FILLET_4_R - 0.0001)  # a hair under: the kernel refuses the full size

    # 圆角5
    fillet_5_edges = [body_2_1.edges().sort_by_distance(p)[0] for p in [
        (16.5, -96.24704609, 15),
        (48.5, -96.24704609, 15),
        (48.5, -107.768665882, 15),
        (16.5, -107.768665882, 15),
    ]]
    fillet(fillet_5_edges, radius=FILLET_5_R)

    # 圆角6
    fillet_6_edges = [body_2_1.edges().sort_by_distance(p)[0] for p in [
        (-48.5, -96.24704609, 15),
        (-16.5, -96.24704609, 15),
        (-16.5, -107.768665882, 15),
        (-48.5, -107.768665882, 15),
    ]]
    fillet(fillet_6_edges, radius=FILLET_6_R)

    # 草图26 → 切除-拉伸18 (cut)
    with BuildSketch(Plane.XZ.offset(107.768665882)):
        with BuildLine():
            Line((35.9, 20.5), (35.9, 32.5))
            ThreePointArc((35.9, 32.5), (37.5, 34.1), (39.1, 32.5))
            Line((39.1, 32.5), (39.1, 20.5))
            ThreePointArc((39.1, 20.5), (37.5, 18.9), (35.9, 20.5))
        make_face()
        with BuildLine():
            Line((25.9, 20.5), (25.9, 32.5))
            ThreePointArc((25.9, 32.5), (27.5, 34.1), (29.1, 32.5))
            Line((29.1, 32.5), (29.1, 20.5))
            ThreePointArc((29.1, 20.5), (27.5, 18.9), (25.9, 20.5))
        make_face()
        with BuildLine():
            Line((-29.1, 20.5), (-29.1, 32.5))
            ThreePointArc((-29.1, 32.5), (-27.5, 34.1), (-25.9, 32.5))
            Line((-25.9, 32.5), (-25.9, 20.5))
            ThreePointArc((-25.9, 20.5), (-27.5, 18.9), (-29.1, 20.5))
        make_face()
        with BuildLine():
            Line((-39.1, 20.5), (-39.1, 32.5))
            ThreePointArc((-39.1, 32.5), (-37.5, 34.1), (-35.9, 32.5))
            Line((-35.9, 32.5), (-35.9, 20.5))
            ThreePointArc((-35.9, 20.5), (-37.5, 18.9), (-39.1, 20.5))
        make_face()
    extrude(amount=-CUT_EXTRUDE_18_DEPTH, mode=Mode.SUBTRACT)

    # 草图27 → 切除-拉伸19 (cut, two sides: drawn at the far end of the back side and taken through both)
    with BuildSketch(Plane(origin=(42.5, 0, 0), x_dir=(0, 0, -1), z_dir=(1, 0, 0)).offset(-CUT_EXTRUDE_19_DEPTH_BACK)):
        with Locations((-32.5, -103.268665882)):
            Rectangle(SKETCH_27_W, SKETCH_27_H)
    extrude(amount=CUT_EXTRUDE_19_DEPTH + CUT_EXTRUDE_19_DEPTH_BACK, mode=Mode.SUBTRACT)

    # 圆角8
    # the kernel refuses this fillet: 1 mm, written as the material it adds along each edge
    with BuildSketch(Plane(origin=(-12.2501, -103.768665882, 17), x_dir=(0, 0, 1), z_dir=(-1, 0, 0))) as fillet_8_piece_1_section:
        with BuildLine():
            CenterArc((FILLET_8_R, FILLET_8_R), FILLET_8_R, 180, 90)
            Line((0, FILLET_8_R), (0, 0))
            Line((0, 0), (FILLET_8_R, 0))
        make_face()
    fillet_8_piece_1 = extrude(amount=40.4998, mode=Mode.PRIVATE)
    fillet_8_piece_1 = split(fillet_8_piece_1, bisect_by=Plane(origin=(-16.5, -103.768665882, 17), z_dir=(-1, 0, 0)), keep=Keep.TOP, mode=Mode.PRIVATE)
    fillet_8_piece_1 = split(fillet_8_piece_1, bisect_by=Plane(origin=(-48.5, -103.768665882, 17), z_dir=(1, 0, 0)), keep=Keep.TOP, mode=Mode.PRIVATE)
    fillet_8_piece_1 = fillet_8_piece_1 - Plane(origin=(-48.4999, -103.768665882, 22.9999), x_dir=(1, 0, 0), z_dir=(0, -1, 0)) * Cylinder(5.9999, 85, mode=Mode.PRIVATE)
    fillet_8_piece_1 = fillet_8_piece_1 - Plane(origin=(-16.5001, -103.768665882, 22.9999), x_dir=(-1, 0, 0), z_dir=(0, -1, 0)) * Cylinder(5.9999, 85, mode=Mode.PRIVATE)
    add(fillet_8_piece_1)

    # 圆角9
    fillet_9_edges = [body_2_1.edges().sort_by_distance(p)[0] for p in [
        (32.5, -103.768665882, 17),
    ]]
    fillet(fillet_9_edges, radius=FILLET_9_R)

    # 圆角10
    fillet_10_edges = [body_2_1.edges().sort_by_distance(p)[0] for p in [
        (-42.5, -105.768665882, 48),
        (-22.5, -105.768665882, 48),
    ]]
    fillet(fillet_10_edges, radius=FILLET_10_R)

    # 草图28 → 切除-拉伸20 (cut)
    with BuildSketch(Plane.XZ.offset(107.768665882)):
        with Locations((0, 42.828466861)):
            Rectangle(SKETCH_28_W, SKETCH_28_H)
    extrude(amount=-CUT_EXTRUDE_20_DEPTH, mode=Mode.SUBTRACT)

    # 圆角12
    fillet_12_edges = [body_2_1.edges().sort_by_distance(p)[0] for p in [
        (22.5, -105.768665882, 37.656933722),
        (42.5, -105.768665882, 37.656933722),
    ]]
    fillet(fillet_12_edges, radius=FILLET_12_R)

    # 圆角13
    fillet_13_edges = [body_2_1.edges().sort_by_distance(p)[0] for p in [
        (-22.5, -105.768665882, 37.656933722),
        (-42.5, -105.768665882, 37.656933722),
    ]]
    fillet(fillet_13_edges, radius=FILLET_13_R)

    # 草图32 → 切除-拉伸22 (cut)
    with BuildSketch(Plane.XZ.offset(107.768665882)):
        with Locations((33.03738191, 27.290061412)):
            Rectangle(SKETCH_32_W, SKETCH_32_H)
    extrude(amount=-CUT_EXTRUDE_22_DEPTH, mode=Mode.SUBTRACT)


solid = body_2_1.part
